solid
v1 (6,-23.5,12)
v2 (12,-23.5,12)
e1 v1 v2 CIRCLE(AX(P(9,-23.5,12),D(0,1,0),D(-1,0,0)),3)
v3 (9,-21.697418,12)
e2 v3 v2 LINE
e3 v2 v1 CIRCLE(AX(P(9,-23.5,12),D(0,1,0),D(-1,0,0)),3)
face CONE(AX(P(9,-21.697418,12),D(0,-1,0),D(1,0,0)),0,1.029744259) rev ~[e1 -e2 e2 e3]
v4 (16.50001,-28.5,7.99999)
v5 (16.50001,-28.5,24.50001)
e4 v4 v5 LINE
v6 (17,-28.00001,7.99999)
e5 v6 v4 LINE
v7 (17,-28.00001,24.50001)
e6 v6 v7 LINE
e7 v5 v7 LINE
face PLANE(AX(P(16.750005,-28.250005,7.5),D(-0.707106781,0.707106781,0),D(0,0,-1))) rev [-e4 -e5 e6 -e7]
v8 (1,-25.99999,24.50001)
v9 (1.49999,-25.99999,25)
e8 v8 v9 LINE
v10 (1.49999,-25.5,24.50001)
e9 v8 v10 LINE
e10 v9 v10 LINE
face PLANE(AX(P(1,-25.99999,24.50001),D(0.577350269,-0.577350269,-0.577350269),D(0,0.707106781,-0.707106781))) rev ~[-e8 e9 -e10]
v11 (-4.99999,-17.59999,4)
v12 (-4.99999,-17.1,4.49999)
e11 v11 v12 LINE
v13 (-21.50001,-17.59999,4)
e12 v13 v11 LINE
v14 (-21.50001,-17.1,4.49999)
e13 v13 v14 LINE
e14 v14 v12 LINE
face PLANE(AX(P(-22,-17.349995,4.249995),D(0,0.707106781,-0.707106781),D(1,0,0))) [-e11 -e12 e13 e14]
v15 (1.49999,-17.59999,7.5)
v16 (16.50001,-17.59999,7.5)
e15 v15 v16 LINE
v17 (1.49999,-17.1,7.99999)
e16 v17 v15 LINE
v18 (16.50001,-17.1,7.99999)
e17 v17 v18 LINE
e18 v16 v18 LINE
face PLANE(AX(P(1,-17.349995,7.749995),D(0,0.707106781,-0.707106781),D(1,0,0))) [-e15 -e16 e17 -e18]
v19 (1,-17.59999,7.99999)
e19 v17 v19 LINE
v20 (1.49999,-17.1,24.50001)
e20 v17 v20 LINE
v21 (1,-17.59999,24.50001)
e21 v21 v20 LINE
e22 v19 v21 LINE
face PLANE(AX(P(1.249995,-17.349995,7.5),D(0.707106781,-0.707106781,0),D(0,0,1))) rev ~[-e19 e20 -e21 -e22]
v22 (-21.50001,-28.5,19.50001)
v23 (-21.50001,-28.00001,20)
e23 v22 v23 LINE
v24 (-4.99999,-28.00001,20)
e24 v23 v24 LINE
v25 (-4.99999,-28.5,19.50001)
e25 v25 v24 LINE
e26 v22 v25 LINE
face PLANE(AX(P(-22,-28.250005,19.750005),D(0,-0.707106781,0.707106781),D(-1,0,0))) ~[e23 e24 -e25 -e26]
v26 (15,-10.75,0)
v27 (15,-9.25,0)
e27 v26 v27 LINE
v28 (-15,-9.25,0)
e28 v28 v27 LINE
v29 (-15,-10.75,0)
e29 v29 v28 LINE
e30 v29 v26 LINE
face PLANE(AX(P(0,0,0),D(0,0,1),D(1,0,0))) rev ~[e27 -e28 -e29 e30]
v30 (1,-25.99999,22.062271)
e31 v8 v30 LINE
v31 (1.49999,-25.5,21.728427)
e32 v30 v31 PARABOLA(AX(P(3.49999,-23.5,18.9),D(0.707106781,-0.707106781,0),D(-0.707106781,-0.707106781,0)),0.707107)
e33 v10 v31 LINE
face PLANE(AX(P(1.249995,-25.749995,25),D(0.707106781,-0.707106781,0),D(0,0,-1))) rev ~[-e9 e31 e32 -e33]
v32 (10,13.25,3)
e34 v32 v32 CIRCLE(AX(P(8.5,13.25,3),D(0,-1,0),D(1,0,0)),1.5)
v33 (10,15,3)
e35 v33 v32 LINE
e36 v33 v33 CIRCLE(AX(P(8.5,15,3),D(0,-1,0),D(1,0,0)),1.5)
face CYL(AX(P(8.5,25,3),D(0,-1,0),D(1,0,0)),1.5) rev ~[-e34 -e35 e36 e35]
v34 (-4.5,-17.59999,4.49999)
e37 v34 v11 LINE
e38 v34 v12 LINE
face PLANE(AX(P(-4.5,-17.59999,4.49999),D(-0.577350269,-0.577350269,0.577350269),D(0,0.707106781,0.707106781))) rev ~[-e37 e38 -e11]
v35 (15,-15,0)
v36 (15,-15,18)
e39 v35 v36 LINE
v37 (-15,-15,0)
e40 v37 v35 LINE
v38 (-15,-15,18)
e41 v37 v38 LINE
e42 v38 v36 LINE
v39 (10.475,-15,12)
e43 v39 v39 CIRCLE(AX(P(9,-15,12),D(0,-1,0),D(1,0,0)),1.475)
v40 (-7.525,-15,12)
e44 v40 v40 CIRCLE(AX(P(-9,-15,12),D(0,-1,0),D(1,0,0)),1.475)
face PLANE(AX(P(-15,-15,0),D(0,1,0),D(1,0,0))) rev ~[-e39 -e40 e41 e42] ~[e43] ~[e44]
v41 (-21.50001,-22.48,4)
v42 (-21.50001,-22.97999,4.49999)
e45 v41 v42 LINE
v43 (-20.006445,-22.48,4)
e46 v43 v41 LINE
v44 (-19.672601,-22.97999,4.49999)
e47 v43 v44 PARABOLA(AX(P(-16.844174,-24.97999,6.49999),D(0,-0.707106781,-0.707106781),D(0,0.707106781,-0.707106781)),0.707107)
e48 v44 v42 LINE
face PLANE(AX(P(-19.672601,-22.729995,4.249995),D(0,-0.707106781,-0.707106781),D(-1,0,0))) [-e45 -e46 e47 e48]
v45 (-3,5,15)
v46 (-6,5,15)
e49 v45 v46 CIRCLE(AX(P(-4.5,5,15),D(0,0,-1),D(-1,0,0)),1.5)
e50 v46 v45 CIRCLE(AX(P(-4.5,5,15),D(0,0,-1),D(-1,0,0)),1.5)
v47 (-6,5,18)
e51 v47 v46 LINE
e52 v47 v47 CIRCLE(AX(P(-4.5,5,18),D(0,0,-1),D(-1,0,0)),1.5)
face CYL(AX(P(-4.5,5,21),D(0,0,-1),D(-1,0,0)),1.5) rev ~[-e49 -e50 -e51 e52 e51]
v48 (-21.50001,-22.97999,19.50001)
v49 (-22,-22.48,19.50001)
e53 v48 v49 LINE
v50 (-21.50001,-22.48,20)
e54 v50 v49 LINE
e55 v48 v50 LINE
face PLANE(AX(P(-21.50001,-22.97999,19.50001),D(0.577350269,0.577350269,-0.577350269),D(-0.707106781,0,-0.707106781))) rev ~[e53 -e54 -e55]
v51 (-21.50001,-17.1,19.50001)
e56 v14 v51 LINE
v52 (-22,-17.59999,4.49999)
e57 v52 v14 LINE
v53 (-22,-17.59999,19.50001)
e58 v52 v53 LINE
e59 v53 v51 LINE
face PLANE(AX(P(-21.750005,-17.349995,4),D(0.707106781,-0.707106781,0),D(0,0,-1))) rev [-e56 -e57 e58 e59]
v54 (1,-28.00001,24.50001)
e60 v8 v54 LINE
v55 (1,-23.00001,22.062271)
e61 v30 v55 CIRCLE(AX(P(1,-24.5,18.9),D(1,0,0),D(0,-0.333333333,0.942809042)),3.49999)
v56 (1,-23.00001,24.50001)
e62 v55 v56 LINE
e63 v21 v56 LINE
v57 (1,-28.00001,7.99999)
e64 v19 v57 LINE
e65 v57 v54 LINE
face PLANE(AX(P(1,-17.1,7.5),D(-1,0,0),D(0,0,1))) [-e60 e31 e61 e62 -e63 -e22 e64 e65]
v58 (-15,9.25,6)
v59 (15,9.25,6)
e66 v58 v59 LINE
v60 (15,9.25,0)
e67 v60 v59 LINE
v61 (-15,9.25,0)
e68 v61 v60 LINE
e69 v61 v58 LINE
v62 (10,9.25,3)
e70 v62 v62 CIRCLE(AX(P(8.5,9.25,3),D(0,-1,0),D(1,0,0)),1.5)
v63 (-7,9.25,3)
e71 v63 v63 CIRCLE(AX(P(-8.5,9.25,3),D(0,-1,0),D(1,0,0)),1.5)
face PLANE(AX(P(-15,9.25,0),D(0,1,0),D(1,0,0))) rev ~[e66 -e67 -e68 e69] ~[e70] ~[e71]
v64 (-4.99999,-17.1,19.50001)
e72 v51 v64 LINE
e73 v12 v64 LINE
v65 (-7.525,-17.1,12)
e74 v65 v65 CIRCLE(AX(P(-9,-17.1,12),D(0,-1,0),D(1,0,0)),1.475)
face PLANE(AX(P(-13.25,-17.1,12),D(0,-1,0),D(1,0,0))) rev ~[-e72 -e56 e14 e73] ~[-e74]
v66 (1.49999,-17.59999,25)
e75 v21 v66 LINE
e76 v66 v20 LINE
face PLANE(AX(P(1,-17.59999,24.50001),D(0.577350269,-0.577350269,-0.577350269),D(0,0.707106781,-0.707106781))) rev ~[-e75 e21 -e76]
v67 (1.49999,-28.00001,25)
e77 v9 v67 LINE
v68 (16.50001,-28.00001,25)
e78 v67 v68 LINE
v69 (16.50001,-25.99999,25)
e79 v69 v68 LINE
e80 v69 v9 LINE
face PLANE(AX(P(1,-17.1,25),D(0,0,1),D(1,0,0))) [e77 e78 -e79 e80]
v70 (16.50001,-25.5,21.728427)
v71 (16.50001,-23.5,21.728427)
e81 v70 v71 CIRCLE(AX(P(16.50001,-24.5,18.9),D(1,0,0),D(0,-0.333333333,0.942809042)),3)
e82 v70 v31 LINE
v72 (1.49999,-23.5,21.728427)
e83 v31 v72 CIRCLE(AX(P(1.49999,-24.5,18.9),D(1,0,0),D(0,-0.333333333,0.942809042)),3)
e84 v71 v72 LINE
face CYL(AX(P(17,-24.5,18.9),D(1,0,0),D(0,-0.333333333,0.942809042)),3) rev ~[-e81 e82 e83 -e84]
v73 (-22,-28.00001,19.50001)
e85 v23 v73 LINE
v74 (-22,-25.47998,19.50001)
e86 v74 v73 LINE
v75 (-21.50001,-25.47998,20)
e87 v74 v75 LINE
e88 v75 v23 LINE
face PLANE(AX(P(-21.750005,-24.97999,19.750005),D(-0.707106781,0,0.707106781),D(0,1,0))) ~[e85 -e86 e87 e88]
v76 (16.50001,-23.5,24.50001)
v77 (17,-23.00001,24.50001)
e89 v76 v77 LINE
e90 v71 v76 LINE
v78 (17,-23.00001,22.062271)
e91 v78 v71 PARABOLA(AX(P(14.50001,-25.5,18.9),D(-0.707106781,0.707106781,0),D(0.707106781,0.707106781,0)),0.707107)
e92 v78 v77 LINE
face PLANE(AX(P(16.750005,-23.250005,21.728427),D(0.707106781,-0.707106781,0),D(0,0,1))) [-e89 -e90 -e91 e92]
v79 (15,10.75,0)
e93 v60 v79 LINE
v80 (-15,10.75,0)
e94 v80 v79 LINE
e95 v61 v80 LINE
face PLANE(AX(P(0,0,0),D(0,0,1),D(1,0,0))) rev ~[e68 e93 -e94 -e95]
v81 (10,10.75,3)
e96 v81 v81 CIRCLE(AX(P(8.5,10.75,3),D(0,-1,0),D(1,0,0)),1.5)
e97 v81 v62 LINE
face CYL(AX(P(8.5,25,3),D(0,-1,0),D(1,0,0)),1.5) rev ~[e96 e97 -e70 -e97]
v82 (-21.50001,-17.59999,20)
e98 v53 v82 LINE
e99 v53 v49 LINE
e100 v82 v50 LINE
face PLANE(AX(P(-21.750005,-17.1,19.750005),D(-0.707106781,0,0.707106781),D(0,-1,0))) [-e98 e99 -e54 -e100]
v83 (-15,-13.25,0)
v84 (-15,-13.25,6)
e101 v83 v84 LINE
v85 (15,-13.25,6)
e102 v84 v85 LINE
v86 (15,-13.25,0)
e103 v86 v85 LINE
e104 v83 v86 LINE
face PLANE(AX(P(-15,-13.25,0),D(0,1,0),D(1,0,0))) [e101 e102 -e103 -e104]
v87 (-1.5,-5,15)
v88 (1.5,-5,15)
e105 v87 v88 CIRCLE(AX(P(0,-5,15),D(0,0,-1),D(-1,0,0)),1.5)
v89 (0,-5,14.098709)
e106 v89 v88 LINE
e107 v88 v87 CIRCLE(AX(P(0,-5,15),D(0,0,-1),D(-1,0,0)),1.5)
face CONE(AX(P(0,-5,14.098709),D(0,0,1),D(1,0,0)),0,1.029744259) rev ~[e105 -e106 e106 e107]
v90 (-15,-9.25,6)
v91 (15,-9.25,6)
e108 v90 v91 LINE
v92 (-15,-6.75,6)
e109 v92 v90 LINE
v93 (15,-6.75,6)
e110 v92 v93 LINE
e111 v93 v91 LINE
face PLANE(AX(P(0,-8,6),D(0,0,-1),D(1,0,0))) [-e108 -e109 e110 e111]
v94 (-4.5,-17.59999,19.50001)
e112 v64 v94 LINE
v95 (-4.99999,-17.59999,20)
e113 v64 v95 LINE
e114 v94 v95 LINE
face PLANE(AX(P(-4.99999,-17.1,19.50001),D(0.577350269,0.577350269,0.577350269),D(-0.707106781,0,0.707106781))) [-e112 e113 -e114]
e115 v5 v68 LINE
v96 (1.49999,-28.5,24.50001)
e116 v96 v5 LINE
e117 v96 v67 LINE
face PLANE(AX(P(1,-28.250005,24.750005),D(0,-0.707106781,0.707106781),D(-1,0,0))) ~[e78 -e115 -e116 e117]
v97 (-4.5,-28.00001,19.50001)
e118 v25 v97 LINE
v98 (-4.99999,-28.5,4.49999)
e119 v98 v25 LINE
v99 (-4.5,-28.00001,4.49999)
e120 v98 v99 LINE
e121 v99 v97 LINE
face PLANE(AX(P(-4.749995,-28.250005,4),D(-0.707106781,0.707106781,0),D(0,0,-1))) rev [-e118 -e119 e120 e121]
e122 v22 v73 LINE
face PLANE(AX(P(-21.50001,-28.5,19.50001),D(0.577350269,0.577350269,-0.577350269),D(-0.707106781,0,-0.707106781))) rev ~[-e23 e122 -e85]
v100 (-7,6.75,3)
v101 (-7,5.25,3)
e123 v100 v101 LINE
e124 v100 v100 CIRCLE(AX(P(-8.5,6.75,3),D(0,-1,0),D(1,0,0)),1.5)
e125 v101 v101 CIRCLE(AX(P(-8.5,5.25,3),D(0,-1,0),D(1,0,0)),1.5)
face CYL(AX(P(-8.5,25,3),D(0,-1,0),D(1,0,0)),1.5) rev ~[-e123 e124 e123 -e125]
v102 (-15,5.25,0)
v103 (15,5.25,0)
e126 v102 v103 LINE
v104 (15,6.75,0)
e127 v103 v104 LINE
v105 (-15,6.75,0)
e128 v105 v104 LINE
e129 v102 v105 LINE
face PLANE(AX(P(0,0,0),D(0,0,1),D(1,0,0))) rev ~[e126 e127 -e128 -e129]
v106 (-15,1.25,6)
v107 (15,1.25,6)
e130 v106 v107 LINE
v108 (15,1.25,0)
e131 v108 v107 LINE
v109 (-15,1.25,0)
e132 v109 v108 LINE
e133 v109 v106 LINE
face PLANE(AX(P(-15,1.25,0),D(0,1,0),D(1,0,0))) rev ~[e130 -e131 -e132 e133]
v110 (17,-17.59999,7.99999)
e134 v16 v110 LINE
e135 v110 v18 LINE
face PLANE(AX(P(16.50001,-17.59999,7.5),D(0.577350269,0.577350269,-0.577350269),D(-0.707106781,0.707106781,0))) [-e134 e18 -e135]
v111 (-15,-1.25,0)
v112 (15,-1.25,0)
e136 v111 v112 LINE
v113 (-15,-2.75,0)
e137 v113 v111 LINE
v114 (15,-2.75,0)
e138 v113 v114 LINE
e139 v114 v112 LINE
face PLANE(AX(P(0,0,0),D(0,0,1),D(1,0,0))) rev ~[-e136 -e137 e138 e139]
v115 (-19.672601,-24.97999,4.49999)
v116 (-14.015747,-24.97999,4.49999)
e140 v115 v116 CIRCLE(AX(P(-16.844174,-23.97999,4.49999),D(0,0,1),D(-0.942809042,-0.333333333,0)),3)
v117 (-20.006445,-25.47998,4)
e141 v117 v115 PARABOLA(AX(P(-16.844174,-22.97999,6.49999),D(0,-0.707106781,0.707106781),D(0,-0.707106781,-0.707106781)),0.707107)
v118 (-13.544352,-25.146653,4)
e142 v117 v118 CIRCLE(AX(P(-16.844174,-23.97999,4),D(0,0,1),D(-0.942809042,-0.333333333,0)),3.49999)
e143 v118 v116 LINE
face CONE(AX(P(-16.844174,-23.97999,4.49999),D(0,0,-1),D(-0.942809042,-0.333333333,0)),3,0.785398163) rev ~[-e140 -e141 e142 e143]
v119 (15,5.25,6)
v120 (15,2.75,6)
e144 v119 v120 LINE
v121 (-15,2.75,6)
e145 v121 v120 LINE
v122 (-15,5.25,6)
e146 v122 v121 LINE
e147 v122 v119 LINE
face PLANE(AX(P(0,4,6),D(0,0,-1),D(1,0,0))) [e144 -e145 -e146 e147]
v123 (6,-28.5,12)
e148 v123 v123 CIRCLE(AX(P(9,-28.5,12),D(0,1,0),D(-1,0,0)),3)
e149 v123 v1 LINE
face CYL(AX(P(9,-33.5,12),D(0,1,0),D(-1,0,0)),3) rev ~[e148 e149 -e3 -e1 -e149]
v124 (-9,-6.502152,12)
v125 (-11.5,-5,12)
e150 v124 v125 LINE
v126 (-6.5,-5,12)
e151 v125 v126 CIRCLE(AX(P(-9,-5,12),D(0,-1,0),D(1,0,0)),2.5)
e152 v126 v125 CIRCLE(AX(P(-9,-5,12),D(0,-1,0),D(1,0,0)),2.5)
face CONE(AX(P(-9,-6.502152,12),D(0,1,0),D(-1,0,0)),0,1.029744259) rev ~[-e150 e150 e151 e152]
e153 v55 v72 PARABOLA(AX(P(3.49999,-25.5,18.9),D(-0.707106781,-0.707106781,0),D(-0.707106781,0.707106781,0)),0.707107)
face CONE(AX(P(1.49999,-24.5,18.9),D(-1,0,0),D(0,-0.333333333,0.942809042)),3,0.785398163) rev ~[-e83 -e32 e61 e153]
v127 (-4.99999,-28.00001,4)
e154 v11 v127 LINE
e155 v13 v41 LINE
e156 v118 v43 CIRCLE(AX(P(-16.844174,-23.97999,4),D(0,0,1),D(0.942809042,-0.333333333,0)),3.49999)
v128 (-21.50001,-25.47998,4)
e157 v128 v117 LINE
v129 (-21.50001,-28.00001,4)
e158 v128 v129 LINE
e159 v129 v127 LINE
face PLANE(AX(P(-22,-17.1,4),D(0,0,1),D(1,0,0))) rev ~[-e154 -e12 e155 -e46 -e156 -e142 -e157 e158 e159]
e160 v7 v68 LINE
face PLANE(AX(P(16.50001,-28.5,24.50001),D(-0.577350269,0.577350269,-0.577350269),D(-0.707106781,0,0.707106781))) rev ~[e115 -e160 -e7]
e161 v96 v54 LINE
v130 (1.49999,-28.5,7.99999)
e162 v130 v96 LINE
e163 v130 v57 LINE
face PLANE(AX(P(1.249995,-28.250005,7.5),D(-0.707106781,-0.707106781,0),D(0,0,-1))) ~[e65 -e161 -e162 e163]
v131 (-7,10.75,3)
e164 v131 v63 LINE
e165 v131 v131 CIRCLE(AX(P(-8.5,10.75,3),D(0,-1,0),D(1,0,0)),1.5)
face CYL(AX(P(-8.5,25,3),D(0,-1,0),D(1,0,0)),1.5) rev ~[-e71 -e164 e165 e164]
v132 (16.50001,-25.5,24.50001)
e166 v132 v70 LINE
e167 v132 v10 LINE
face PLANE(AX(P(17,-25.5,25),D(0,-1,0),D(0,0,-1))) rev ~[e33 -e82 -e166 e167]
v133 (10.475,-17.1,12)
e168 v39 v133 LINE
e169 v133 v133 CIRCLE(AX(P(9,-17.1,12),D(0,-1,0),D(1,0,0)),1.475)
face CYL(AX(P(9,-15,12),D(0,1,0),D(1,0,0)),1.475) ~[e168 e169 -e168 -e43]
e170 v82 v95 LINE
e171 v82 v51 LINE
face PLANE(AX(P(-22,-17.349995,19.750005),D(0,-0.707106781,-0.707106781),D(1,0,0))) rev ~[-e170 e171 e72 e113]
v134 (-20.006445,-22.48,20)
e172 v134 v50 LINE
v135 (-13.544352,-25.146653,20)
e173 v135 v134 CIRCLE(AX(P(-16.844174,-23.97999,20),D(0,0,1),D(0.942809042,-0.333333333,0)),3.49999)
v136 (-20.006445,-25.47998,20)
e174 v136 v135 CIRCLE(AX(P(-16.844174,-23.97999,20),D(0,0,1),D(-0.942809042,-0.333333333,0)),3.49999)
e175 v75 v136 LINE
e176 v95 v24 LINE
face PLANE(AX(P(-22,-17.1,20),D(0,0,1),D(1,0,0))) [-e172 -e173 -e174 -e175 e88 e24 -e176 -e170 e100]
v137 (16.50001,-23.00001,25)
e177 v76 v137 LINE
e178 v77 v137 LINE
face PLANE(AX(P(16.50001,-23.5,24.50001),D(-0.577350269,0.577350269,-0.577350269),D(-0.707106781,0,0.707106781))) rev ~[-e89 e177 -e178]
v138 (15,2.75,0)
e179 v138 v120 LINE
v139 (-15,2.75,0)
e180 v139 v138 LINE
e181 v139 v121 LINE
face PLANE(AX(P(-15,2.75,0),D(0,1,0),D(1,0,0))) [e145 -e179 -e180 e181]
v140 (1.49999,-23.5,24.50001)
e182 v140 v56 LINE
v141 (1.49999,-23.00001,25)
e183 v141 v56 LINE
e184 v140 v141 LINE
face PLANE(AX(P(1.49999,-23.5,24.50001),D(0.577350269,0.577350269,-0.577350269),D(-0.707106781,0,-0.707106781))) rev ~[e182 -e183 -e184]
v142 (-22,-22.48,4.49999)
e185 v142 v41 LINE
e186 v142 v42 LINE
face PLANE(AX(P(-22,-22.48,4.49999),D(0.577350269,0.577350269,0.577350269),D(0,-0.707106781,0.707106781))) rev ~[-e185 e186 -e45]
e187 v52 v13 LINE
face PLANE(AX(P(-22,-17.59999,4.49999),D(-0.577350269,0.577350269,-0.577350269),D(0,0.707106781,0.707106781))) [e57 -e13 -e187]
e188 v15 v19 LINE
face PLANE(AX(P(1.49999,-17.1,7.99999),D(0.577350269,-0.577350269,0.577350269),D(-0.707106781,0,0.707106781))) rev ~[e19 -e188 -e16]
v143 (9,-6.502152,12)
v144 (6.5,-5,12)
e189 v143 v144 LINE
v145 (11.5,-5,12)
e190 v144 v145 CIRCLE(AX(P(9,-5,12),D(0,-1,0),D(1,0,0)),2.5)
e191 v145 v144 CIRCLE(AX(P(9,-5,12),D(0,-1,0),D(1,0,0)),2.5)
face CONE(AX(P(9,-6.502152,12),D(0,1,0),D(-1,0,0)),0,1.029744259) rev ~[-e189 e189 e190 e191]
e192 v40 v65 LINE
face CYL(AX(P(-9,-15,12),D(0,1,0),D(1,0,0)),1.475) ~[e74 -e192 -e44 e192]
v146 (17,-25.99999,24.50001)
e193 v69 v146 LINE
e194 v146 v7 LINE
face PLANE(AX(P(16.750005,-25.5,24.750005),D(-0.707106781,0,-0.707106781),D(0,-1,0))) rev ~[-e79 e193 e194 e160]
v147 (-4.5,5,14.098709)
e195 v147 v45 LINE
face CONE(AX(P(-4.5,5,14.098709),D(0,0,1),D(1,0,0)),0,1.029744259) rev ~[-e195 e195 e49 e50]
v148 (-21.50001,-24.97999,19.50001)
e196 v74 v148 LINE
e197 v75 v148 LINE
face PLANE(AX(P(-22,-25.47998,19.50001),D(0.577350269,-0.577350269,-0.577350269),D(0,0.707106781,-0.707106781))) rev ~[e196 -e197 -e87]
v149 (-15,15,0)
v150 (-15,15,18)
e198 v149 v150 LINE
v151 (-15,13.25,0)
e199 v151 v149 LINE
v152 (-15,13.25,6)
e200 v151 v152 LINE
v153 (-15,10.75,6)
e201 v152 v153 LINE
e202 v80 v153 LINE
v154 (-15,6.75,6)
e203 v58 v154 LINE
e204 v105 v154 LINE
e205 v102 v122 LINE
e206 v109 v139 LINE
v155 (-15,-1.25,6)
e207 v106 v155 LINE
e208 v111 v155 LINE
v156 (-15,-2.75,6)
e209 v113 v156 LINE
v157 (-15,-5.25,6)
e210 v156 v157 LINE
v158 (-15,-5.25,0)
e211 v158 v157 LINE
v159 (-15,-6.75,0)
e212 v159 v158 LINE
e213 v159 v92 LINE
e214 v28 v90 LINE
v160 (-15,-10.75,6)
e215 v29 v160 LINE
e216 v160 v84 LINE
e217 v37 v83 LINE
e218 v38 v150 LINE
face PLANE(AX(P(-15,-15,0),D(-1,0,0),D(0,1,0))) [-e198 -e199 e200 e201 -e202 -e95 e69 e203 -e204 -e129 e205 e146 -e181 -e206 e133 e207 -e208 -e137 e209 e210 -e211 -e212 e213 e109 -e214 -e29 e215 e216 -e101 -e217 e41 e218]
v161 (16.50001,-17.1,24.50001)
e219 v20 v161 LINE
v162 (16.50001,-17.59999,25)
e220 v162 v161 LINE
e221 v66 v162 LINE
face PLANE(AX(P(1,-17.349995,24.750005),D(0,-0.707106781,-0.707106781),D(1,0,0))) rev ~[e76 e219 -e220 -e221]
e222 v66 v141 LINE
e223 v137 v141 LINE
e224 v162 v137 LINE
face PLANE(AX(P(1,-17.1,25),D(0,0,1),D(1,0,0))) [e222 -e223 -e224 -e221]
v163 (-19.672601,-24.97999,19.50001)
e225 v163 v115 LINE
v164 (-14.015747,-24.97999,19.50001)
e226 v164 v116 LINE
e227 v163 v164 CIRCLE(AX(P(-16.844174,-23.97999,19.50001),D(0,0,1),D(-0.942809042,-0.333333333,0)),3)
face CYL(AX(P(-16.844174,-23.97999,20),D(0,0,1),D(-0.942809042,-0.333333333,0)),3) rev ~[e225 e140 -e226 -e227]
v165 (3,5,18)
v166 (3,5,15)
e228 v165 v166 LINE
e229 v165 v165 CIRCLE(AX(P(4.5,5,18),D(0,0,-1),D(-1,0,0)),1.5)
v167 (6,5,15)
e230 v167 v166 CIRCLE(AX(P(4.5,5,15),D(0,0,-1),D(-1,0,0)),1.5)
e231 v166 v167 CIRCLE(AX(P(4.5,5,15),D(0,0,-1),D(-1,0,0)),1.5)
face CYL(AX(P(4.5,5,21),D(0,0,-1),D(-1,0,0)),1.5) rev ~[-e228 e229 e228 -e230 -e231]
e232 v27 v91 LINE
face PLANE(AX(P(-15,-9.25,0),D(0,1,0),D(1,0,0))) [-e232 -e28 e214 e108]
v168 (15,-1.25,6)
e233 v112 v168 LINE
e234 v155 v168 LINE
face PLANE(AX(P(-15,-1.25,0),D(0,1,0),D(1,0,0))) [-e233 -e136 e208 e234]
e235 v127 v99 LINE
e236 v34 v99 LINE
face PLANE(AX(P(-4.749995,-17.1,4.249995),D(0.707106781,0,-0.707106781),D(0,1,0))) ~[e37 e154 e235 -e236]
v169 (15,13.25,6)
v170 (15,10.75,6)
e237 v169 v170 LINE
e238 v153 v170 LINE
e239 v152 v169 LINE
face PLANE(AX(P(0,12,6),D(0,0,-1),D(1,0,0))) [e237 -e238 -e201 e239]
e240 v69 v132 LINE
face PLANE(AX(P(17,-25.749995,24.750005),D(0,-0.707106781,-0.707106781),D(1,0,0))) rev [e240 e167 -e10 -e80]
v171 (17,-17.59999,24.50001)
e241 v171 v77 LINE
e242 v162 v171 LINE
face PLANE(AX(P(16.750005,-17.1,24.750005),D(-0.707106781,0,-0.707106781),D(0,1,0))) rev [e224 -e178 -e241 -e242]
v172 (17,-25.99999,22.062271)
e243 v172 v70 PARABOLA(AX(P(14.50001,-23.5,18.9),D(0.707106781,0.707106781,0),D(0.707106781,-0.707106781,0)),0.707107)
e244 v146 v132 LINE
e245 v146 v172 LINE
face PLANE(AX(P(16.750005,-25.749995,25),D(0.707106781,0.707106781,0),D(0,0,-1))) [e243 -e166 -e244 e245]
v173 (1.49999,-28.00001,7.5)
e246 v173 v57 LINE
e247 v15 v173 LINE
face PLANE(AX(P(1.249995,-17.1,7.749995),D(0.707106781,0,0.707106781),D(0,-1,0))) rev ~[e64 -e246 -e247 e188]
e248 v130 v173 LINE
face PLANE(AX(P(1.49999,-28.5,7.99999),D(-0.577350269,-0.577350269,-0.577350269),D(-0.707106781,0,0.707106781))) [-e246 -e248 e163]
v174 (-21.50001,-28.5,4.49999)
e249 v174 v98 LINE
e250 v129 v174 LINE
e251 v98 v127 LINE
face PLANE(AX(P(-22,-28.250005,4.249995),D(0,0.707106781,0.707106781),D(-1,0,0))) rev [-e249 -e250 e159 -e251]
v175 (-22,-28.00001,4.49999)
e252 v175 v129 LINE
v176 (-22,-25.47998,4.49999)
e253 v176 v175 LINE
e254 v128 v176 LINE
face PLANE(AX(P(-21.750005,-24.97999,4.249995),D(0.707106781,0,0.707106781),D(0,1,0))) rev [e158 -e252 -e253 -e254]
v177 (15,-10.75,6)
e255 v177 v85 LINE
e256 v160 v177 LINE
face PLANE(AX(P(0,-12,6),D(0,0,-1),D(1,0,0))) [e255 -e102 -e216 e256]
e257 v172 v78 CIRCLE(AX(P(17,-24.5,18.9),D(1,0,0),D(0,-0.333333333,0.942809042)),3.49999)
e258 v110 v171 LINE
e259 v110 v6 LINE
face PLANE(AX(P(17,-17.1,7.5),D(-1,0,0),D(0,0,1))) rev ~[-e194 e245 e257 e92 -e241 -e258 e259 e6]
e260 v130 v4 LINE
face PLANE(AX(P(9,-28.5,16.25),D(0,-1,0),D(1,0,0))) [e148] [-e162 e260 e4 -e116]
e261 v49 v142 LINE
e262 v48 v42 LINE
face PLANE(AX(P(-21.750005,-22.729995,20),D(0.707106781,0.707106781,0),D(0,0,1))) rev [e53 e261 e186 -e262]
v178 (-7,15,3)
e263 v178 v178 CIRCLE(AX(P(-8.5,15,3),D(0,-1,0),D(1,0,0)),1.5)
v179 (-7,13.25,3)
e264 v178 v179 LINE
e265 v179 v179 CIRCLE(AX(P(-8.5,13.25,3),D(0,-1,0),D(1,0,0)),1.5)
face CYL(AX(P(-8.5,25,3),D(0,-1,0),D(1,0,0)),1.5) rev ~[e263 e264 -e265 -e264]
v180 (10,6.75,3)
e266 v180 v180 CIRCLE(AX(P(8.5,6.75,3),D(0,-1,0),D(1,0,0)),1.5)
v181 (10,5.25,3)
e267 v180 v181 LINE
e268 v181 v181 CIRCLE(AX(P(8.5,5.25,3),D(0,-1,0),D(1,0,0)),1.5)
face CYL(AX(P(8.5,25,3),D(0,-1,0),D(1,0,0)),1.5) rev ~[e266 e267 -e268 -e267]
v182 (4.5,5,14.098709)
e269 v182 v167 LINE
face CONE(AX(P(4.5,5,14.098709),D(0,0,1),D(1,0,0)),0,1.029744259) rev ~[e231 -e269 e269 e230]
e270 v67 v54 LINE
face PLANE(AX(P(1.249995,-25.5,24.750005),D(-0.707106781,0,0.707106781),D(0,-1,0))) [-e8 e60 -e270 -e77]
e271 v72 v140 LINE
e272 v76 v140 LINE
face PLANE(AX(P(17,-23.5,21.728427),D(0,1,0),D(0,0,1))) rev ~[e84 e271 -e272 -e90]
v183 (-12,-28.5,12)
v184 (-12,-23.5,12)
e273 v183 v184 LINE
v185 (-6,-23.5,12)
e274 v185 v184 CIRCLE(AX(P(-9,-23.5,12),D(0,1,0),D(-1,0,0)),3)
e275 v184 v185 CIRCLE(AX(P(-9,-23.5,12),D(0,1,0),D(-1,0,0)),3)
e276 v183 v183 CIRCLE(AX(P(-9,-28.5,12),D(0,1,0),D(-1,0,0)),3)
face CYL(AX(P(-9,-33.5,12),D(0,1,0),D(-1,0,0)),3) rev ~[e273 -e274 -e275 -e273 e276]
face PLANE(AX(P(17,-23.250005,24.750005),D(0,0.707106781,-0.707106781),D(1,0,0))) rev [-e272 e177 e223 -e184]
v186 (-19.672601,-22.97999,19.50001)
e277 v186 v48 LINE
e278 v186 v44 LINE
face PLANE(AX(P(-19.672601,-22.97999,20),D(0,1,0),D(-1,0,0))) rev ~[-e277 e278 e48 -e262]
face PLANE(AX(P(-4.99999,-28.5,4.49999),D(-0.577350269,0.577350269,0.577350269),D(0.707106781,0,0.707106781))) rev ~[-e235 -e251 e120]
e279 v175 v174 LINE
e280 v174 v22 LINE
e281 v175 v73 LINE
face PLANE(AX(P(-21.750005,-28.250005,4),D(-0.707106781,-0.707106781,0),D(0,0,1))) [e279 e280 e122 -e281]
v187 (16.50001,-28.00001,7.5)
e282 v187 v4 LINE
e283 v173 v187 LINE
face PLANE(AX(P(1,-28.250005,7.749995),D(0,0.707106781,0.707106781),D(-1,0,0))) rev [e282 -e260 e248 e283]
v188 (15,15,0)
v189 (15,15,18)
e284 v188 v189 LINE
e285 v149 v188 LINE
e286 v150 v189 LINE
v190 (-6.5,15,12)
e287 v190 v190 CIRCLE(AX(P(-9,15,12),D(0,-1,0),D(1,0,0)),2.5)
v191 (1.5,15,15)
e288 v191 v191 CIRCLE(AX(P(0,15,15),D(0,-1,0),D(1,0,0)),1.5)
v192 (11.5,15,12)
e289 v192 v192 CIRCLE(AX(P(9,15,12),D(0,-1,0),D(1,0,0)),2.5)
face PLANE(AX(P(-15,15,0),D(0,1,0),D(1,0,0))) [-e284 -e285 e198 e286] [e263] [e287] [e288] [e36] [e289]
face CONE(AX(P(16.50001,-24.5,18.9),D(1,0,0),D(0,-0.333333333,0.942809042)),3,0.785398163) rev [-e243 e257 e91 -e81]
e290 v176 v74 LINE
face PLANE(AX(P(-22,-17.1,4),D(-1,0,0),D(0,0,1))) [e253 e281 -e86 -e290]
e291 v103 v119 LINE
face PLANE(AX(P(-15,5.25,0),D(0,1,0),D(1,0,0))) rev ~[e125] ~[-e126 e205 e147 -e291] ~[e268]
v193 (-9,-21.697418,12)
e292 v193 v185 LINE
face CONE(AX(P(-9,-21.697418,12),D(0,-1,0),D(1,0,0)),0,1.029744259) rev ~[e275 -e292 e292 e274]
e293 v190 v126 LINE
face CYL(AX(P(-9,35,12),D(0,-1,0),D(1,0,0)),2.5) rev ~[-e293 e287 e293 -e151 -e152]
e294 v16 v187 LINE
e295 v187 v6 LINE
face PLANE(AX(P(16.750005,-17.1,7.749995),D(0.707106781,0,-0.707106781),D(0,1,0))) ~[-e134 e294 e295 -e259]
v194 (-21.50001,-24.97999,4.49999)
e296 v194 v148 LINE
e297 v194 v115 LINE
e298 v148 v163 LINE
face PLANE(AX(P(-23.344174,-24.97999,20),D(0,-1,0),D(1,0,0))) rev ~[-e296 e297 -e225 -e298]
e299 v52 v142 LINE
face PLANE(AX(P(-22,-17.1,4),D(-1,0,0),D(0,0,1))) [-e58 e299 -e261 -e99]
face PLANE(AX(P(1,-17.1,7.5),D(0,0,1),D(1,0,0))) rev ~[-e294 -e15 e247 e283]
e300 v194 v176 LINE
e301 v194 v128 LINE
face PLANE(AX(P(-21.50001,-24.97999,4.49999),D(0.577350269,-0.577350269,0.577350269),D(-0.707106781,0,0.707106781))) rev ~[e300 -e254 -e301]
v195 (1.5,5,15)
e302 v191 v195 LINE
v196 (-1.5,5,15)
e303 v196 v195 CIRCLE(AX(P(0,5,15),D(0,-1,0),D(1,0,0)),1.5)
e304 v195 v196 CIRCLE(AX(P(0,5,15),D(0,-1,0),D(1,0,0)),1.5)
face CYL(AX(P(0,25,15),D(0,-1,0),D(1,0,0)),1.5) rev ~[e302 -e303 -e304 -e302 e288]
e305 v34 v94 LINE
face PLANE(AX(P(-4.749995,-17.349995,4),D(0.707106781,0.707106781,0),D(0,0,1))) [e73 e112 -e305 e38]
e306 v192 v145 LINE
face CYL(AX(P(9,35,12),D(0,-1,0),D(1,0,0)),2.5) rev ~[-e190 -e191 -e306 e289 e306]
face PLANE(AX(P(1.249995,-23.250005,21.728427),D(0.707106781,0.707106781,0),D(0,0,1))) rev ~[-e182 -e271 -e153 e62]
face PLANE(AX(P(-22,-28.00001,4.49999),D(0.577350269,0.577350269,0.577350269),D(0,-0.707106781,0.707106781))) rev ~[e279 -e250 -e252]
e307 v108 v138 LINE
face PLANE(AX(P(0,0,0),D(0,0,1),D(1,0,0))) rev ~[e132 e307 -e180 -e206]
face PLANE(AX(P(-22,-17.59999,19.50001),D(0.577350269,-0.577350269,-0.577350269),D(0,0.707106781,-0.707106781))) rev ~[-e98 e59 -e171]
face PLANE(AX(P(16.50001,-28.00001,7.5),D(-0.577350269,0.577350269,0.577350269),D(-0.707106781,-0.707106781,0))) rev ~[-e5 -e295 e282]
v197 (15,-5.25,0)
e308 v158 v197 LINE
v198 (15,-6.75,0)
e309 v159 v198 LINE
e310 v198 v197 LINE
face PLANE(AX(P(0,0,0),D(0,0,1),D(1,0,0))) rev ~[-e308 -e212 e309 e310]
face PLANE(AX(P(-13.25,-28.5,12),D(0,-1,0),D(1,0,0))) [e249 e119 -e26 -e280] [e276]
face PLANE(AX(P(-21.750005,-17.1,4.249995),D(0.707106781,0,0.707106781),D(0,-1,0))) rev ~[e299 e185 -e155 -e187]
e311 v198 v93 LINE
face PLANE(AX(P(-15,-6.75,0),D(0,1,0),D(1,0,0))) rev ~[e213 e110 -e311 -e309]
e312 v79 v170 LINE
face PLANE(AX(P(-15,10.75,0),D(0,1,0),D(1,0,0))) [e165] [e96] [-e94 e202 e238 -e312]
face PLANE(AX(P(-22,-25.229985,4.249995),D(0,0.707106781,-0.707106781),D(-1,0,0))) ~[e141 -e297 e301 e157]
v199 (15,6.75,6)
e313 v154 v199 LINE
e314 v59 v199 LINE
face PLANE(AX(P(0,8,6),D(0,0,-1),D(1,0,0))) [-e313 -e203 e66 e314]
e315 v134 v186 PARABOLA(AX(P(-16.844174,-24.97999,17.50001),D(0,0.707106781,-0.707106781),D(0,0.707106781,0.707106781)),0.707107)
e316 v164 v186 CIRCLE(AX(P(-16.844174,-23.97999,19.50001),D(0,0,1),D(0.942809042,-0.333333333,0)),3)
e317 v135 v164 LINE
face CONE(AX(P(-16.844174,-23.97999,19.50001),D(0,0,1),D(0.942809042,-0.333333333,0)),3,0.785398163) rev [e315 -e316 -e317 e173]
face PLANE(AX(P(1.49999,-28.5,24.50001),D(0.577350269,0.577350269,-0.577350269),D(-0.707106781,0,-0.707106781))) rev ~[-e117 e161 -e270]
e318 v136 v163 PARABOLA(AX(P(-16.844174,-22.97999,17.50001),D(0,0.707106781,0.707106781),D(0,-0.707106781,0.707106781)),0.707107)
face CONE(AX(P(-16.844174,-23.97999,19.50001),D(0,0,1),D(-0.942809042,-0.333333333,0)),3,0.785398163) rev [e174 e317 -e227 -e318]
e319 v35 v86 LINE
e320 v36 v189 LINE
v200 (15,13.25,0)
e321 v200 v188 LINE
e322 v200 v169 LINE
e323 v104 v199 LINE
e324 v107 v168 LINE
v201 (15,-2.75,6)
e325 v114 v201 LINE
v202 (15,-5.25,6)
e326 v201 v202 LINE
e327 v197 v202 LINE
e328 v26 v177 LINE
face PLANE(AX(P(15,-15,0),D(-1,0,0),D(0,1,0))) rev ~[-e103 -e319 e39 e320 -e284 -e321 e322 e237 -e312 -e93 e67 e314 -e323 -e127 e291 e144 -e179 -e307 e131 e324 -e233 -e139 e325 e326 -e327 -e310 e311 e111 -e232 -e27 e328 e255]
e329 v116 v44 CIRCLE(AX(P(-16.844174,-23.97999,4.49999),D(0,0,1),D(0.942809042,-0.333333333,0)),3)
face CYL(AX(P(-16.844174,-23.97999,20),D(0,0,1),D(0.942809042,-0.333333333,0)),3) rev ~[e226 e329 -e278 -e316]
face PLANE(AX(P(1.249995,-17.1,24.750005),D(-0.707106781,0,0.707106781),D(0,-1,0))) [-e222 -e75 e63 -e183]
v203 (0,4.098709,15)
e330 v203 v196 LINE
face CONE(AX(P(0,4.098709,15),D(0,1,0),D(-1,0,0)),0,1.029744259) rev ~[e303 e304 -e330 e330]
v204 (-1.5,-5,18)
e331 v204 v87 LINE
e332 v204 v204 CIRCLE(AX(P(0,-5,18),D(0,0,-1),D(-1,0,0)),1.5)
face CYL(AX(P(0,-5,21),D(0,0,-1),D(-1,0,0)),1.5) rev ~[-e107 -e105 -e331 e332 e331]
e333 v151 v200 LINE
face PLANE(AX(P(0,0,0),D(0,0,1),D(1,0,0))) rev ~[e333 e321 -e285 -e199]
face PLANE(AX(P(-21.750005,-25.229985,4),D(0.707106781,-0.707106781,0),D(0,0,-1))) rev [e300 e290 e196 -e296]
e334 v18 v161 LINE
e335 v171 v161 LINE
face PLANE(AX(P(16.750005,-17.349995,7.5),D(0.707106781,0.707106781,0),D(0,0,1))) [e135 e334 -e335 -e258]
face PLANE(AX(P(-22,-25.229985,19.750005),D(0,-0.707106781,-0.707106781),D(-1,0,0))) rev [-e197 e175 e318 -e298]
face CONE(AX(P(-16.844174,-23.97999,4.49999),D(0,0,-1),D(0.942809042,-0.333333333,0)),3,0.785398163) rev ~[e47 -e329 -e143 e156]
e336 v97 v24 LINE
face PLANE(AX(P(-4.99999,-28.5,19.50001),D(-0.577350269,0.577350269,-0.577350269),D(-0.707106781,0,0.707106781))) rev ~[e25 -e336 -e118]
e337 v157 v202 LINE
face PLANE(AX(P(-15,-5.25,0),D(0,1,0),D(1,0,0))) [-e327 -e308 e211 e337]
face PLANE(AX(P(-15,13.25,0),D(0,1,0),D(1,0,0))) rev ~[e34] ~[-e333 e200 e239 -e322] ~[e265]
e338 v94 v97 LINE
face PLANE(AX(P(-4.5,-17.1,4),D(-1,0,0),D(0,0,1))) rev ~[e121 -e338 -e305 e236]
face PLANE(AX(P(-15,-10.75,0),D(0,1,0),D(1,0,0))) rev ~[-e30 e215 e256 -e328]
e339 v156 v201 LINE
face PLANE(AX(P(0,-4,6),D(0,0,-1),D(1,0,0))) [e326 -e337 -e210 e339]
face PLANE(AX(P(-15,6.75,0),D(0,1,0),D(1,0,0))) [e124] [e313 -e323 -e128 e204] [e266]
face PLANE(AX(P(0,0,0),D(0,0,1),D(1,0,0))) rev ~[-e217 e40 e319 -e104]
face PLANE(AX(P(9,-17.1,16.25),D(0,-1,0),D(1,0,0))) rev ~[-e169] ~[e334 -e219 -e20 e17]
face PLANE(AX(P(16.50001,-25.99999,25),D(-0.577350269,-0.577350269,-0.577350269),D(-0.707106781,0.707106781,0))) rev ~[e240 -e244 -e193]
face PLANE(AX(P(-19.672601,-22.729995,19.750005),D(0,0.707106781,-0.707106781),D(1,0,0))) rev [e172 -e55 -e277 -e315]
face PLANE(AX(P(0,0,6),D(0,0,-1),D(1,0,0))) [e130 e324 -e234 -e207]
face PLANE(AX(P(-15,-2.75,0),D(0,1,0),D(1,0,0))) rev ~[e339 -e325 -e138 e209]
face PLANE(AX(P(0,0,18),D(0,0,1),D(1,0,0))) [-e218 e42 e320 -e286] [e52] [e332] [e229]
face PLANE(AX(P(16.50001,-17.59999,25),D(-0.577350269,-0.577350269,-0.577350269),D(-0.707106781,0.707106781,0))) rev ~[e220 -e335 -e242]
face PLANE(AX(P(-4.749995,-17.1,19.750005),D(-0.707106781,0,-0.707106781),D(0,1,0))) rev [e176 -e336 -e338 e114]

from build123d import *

# Parameters (mm, degrees)
F0_W            = 30
F0_H            = 30
F11_DEPTH       = 18
F1_D            = 5
F1_DEPTH        = 20
F1_TIP          = 1.5021515476
F13_W           = 30
F13_H           = 2.5
F14_DEPTH       = 6
F15_D           = 3
F15_DEPTH       = 3
F15_TIP         = 0.9012909285
F16_D           = 3
F16_DEPTH       = 10
F16_TIP         = 0.9012909285
F3_R            = 1.475
F4_DEPTH        = 2.1
F18_W           = 17.5
F18_H           = 16
F17_W           = 16
F17_H           = 17.5
F19_DEPTH       = 11.4
F5_D            = 6
F5_DEPTH        = 5
F5_TIP          = 1.8025818571
F5_ON_F20_D     = 6
F5_ON_F20_DEPTH = 5
F5_ON_F20_TIP   = 1.8025818571
F8_DEPTH        = 16
F7_W            = 1.3441740274
F7_H            = 2
F22_DEPTH       = 16
F9_SIZE         = 0.49999


# Not quite as in the source:
# - a fillet or chamfer is up to 0.001 mm smaller than in the source, because OpenCascade refuses the exact size


with BuildPart() as f11:
    # F0 (on Top) → F11 (new body)
    with BuildSketch(Plane.XY):
        Rectangle(F0_W, F0_H)
    extrude(amount=F11_DEPTH)

    # F1
    with Locations(Plane(origin=(0, 15, 0), x_dir=(-1, 0, 0), z_dir=(0, 1, 0))):
        with Locations((-9, 12), (9, 12)):
            Hole(F1_D / 2, depth=F1_DEPTH)
            with Locations((0, 0, -(F1_DEPTH + F1_TIP / 2))):  # 118° drill point
                Cone(0, F1_D / 2, F1_TIP, mode=Mode.SUBTRACT)

    # F13 (on face) → F14 (cut)
    with BuildSketch(Plane(origin=(0, 0, 0), x_dir=(1, 0, 0), z_dir=(0, 0, -1))):
        with Locations((0, 12)):
            Rectangle(F13_W, F13_H)
        with Locations((0, 8)):
            Rectangle(F13_W, F13_H)
        with Locations((0, 4)):
            Rectangle(F13_W, F13_H)
        Rectangle(F13_W, F13_H)
        with Locations((0, -4)):
            Rectangle(F13_W, F13_H)
        with Locations((0, -8)):
            Rectangle(F13_W, F13_H)
        with Locations((0, -12)):
            Rectangle(F13_W, F13_H)
    extrude(amount=-F14_DEPTH, mode=Mode.SUBTRACT)

    # F15
    with Locations(Plane.XY.offset(18)):
        with Locations((4.5, 5), (-4.5, 5), (0, -5)):
            Hole(F15_D / 2, depth=F15_DEPTH)
            with Locations((0, 0, -(F15_DEPTH + F15_TIP / 2))):  # 118° drill point
                Cone(0, F15_D / 2, F15_TIP, mode=Mode.SUBTRACT)

    # F16
    with Locations(Plane(origin=(0, 15, 0), x_dir=(-1, 0, 0), z_dir=(0, 1, 0))):
        with Locations((8.5, 3), (-8.5, 3), (0, 15)):
            Hole(F16_D / 2, depth=F16_DEPTH)
            with Locations((0, 0, -(F16_DEPTH + F16_TIP / 2))):  # 118° drill point
                Cone(0, F16_D / 2, F16_TIP, mode=Mode.SUBTRACT)

    # F3 (on face) → F4 (join)
    with BuildSketch(Plane.XZ.offset(15)):
        with Locations((-9, 12)):
            Circle(F3_R)
        with Locations((9, 12)):
            Circle(F3_R)
    extrude(amount=F4_DEPTH)

    # F18 (on face) + F17 (on face) → F19 (join)
    with BuildSketch(Plane.XZ.offset(17.1)):
        with Locations((-13.25, 12)):
            Rectangle(F18_W, F18_H)
    with BuildSketch(Plane.XZ.offset(17.1)):
        with Locations((9, 16.25)):
            Rectangle(F17_W, F17_H)
    extrude(amount=F19_DEPTH)

    # F5
    with Locations(Plane.XZ.offset(28.5)):
        with Locations((-9, 12)):
            Hole(F5_D / 2, depth=F5_DEPTH)
            with Locations((0, 0, -(F5_DEPTH + F5_TIP / 2))):  # 118° drill point
                Cone(0, F5_D / 2, F5_TIP, mode=Mode.SUBTRACT)

    # F5 on F20
    with Locations(Plane.XZ.offset(28.5)):
        with Locations((9, 12)):
            Hole(F5_ON_F20_D / 2, depth=F5_ON_F20_DEPTH)
            with Locations((0, 0, -(F5_ON_F20_DEPTH + F5_ON_F20_TIP / 2))):  # 118° drill point
                Cone(0, F5_ON_F20_D / 2, F5_ON_F20_TIP, mode=Mode.SUBTRACT)

    # F6 (on face) → F8 (cut, through all)
    with BuildSketch(Plane.YZ.offset(17)):
        with BuildLine():
            Line((-25.5, 25), (-25.5, 21.7284271247))
            ThreePointArc((-25.5, 21.7284271247), (-24.5, 15.9), (-23.5, 21.7284271247))
            Line((-23.5, 21.7284271247), (-23.5, 25))
            Line((-23.5, 25), (-25.5, 25))
        make_face()
    extrude(amount=-F8_DEPTH, mode=Mode.SUBTRACT)

    # F7 (on face) → F22 (cut, through all)
    with BuildSketch(Plane.XY.offset(20)):
        with BuildLine():
            Line((-22, -24.9799899757), (-19.6726011522, -24.9799899757))
            ThreePointArc((-19.6726011522, -24.9799899757), (-16.8441740274, -26.9799899757), (-14.0157469027, -24.9799899757))
            ThreePointArc((-14.0157469027, -24.9799899757), (-15.8441740274, -21.1515628509), (-19.6726011522, -22.9799899757))
            Line((-19.6726011522, -22.9799899757), (-22, -22.9799899757))
            Line((-22, -22.9799899757), (-22, -24.9799899757))
        make_face()
        with Locations((-22.6720870137, -23.9799899757)):
            Rectangle(F7_W, F7_H)
    extrude(amount=-F22_DEPTH, mode=Mode.SUBTRACT)

    # F9 (size 0.5 in the source; OpenCascade refuses exactly that, so slightly less here)
    f9_edges = [f11.edges().sort_by_distance(p)[0] for p in [
        (17, -17.1, 16.25),
        (17, -20.3, 25),
        (17, -23.5, 23.364214),
        (17, -24.5, 15.9),
        (17, -25.5, 23.364214),
        (17, -27, 25),
        (17, -28.5, 16.25),
        (17, -22.8, 7.5),
        (1, -22.8, 7.5),
        (9, -17.1, 7.5),
        (9, -28.5, 7.5),
        (-13.25, -17.1, 4),
        (-4.5, -22.8, 4),
        (-13.25, -28.5, 4),
        (-22, -26.739995, 4),
        (-20.836301, -24.97999, 4),
        (-13.844174, -23.97999, 4),
        (-20.836301, -22.97999, 4),
        (-22, -20.039995, 4),
        (-4.5, -22.8, 20),
        (-4.5, -17.1, 12),
        (-4.5, -28.5, 12),
        (9, -17.1, 25),
        (1, -20.3, 25),
        (9, -23.5, 25),
        (9, -25.5, 25),
        (1, -27, 25),
        (9, -28.5, 25),
        (-13.25, -17.1, 20),
        (-22, -20.039995, 20),
        (-20.836301, -22.97999, 20),
        (-13.844174, -23.97999, 20),
        (-20.836301, -24.97999, 20),
        (-22, -26.739995, 20),
        (-13.25, -28.5, 20),
        (-22, -17.1, 12),
        (-22, -22.97999, 12),
        (1, -17.1, 16.25),
        (1, -28.5, 16.25),
        (1, -25.5, 23.364214),
        (1, -24.5, 15.9),
        (1, -23.5, 23.364214),
        (-22, -24.97999, 12),
        (-22, -28.5, 12),
    ]]
    chamfer(f9_edges, length=F9_SIZE)


solid = f11.part
